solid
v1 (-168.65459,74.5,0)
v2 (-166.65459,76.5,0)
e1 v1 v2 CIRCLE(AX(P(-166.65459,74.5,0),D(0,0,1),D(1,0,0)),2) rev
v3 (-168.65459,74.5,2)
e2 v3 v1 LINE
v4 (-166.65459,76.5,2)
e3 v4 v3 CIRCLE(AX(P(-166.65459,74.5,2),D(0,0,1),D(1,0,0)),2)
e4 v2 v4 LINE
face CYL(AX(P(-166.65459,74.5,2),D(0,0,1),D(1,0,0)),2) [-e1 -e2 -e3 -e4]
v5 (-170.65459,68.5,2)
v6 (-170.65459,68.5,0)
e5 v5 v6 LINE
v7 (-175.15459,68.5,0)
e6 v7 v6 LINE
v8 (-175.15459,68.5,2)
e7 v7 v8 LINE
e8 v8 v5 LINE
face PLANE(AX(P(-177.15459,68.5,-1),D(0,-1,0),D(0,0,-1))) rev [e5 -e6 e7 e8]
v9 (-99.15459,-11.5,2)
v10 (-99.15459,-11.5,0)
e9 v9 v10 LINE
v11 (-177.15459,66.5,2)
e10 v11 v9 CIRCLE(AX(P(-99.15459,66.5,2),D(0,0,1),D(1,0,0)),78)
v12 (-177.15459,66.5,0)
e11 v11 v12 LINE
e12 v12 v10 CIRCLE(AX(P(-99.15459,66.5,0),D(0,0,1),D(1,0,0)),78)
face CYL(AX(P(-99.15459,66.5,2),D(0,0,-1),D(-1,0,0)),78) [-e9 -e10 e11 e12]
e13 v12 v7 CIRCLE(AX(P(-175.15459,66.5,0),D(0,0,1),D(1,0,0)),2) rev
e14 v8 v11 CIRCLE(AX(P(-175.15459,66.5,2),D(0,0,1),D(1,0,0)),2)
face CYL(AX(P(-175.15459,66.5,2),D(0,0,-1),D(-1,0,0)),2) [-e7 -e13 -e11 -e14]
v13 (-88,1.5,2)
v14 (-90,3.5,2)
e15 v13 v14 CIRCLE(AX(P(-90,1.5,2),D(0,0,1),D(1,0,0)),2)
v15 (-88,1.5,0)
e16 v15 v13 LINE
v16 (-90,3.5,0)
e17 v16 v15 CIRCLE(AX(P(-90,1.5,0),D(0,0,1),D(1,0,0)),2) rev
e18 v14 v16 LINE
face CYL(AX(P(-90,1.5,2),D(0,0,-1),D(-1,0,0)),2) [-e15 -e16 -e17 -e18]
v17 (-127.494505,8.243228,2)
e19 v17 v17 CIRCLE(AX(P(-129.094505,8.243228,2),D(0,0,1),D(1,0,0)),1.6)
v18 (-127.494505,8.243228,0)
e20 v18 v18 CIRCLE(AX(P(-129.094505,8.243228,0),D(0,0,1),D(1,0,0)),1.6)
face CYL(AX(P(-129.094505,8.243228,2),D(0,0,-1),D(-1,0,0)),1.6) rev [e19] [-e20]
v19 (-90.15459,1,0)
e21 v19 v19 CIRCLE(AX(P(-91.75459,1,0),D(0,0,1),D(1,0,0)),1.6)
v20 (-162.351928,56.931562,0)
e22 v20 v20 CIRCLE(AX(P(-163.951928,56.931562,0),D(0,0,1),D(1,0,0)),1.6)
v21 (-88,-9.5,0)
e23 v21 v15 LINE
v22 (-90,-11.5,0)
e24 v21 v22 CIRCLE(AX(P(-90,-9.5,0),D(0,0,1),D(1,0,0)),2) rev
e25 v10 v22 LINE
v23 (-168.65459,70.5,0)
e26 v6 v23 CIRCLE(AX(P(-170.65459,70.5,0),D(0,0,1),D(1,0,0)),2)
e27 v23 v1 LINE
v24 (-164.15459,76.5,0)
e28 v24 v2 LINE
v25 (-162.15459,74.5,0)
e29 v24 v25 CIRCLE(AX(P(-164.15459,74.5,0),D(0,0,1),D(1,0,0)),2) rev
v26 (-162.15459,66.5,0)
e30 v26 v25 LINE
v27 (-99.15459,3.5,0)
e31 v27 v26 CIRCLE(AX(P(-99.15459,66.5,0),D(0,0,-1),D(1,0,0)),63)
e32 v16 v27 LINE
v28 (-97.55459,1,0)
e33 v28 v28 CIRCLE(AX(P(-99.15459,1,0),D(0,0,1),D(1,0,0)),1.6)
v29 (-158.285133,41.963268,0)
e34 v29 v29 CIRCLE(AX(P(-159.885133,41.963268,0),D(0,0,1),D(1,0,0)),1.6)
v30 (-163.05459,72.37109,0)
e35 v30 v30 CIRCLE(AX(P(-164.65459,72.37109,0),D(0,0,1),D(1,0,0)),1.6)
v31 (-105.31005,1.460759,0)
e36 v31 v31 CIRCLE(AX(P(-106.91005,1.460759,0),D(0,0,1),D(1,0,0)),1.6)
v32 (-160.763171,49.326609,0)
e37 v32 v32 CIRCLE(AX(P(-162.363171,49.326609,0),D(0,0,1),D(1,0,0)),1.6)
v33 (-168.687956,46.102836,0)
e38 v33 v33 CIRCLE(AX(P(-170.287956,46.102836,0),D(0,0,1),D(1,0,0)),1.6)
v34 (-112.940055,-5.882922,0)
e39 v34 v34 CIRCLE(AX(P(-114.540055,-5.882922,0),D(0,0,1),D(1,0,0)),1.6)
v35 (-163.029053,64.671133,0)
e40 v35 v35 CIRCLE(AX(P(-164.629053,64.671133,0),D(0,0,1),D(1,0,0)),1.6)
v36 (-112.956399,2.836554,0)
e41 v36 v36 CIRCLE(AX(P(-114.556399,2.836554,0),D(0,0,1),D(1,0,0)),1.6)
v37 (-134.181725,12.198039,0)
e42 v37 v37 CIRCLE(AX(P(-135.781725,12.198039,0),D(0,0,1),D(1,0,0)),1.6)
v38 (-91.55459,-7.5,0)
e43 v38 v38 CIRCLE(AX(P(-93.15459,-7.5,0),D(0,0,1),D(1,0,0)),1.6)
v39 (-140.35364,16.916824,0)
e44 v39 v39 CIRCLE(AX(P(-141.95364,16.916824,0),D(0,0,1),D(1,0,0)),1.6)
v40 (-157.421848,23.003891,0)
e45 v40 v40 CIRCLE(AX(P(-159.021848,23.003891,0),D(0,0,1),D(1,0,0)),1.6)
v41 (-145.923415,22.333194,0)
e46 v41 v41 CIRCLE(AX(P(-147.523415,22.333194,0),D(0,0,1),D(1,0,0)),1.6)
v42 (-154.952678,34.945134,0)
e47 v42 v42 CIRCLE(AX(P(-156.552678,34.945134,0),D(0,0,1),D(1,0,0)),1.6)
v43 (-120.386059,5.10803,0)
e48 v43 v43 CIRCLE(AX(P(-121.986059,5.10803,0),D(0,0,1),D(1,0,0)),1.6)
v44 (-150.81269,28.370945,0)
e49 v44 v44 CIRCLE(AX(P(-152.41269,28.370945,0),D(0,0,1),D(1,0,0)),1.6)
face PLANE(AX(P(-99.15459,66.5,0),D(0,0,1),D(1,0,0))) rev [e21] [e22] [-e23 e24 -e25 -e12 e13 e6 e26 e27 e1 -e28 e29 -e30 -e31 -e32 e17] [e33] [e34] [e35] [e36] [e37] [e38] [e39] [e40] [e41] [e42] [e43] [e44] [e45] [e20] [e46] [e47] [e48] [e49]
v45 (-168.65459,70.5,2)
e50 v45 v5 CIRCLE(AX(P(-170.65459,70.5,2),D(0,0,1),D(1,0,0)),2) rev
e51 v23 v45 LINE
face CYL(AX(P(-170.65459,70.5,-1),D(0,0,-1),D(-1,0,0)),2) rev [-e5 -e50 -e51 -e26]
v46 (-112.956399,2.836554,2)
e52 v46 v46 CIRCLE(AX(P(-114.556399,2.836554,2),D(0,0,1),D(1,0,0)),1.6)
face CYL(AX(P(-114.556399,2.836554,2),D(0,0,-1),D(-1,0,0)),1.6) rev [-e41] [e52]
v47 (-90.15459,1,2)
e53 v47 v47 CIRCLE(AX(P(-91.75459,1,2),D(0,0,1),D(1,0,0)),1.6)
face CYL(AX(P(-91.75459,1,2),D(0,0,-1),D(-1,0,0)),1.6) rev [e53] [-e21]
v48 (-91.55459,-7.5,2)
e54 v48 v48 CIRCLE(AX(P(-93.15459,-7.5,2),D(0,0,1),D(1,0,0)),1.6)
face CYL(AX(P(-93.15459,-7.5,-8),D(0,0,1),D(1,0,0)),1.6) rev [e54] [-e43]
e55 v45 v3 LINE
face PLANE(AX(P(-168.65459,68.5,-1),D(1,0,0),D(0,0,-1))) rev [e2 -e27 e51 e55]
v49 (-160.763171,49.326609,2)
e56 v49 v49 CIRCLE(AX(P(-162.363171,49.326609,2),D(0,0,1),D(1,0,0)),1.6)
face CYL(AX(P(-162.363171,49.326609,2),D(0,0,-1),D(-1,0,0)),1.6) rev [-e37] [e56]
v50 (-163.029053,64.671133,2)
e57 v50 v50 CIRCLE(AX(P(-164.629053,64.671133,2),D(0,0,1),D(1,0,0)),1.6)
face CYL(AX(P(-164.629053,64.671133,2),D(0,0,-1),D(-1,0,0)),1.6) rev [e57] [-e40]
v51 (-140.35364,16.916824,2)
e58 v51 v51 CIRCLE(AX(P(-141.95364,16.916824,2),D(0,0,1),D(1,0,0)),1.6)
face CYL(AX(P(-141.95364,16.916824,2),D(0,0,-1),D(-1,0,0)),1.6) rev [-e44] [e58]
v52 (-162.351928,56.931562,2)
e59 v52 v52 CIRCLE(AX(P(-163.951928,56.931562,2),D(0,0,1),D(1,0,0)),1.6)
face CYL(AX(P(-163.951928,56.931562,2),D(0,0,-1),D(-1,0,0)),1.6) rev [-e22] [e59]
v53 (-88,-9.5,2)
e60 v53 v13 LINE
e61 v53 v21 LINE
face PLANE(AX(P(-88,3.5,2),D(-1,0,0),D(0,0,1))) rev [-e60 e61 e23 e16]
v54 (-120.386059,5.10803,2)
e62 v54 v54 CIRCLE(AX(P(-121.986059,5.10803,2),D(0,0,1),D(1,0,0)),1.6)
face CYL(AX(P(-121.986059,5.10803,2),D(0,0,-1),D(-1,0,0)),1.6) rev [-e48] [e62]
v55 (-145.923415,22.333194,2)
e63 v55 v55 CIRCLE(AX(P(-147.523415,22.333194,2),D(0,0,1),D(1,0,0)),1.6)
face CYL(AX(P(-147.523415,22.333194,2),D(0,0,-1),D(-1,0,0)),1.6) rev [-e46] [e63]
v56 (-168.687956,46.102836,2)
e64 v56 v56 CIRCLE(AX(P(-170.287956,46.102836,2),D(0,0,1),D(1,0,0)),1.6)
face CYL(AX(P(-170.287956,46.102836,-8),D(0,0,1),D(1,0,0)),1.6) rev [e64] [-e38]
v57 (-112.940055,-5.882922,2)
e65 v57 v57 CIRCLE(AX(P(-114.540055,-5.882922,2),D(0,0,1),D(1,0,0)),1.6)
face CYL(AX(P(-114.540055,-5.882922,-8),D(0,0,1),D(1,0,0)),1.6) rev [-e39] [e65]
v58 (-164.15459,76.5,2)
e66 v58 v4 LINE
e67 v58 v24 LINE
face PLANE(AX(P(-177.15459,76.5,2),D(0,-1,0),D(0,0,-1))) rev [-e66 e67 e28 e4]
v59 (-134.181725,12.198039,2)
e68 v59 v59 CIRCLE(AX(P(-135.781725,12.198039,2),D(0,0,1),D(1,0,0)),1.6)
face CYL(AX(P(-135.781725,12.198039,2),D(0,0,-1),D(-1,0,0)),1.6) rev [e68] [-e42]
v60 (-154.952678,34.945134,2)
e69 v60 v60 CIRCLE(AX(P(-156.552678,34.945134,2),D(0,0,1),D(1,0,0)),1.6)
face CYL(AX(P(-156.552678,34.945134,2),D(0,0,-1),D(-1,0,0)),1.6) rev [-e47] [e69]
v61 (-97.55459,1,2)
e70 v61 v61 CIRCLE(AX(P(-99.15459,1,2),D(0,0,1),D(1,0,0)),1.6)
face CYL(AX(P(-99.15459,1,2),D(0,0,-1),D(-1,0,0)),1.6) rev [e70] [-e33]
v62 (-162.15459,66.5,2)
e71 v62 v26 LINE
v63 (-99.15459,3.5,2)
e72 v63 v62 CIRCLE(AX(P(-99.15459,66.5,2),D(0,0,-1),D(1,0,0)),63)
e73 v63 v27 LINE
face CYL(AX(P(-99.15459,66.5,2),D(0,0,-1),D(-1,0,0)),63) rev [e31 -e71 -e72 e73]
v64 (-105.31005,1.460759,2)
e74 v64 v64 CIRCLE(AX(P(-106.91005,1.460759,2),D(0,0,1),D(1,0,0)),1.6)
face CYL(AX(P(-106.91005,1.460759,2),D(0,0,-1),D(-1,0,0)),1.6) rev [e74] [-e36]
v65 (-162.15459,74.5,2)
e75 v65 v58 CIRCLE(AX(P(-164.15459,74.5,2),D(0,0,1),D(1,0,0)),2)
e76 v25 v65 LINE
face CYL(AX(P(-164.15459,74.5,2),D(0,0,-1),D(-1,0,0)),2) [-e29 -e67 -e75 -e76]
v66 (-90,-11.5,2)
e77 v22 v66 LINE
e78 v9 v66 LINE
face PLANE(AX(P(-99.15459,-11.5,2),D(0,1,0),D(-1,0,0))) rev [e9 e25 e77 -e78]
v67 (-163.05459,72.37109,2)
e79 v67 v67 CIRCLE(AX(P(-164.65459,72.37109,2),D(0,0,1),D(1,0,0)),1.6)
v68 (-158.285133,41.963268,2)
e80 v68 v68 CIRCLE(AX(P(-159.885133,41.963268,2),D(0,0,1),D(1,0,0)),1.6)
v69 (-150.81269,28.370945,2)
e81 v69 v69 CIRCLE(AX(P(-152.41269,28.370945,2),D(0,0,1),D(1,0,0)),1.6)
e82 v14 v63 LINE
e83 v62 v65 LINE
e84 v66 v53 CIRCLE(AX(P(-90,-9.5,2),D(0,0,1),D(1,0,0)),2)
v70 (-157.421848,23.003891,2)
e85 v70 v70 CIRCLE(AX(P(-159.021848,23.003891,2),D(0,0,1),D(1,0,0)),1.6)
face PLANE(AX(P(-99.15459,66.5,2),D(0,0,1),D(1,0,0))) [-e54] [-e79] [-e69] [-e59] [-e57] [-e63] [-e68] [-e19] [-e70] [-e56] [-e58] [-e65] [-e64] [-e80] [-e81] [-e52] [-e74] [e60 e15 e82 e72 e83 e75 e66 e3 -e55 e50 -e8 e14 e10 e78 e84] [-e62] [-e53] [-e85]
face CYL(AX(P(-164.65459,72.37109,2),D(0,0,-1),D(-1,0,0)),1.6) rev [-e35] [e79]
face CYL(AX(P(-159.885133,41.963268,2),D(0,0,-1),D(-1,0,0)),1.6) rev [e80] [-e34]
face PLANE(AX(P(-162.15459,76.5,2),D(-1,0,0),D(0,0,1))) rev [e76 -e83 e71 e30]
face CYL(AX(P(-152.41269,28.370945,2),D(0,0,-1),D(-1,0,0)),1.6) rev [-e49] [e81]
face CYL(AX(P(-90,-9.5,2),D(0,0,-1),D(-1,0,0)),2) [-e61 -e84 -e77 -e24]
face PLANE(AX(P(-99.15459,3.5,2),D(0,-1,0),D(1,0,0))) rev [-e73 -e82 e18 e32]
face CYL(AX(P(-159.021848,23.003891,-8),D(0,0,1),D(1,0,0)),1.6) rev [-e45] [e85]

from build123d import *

# Parameters (mm, degrees)
SKETCH_2_R          = 1.6
EXTRUDE_1_DEPTH     = 2
SKETCH_4_W          = 8.5
SKETCH_4_H          = 8
CUT_EXTRUDE_1_DEPTH = 3
SKETCH_6_R          = 1.6
CUT_EXTRUDE_2_DEPTH = 10
FILLET_1_R          = 2
FILLET_2_R          = 2


with BuildPart() as part:
    # 草图2 → 凸台-拉伸1 (new body)
    with BuildSketch(Plane.XY):
        with BuildLine():
            Line((-162.154590294, 76.5), (-162.154590294, 66.5))
            ThreePointArc((-162.154590294, 66.5), (-143.702317509, 21.952272785), (-99.154590294, 3.5))
            Line((-99.154590294, 3.5), (-88, 3.5))
            Line((-88, 3.5), (-88, -11.5))
            Line((-88, -11.5), (-99.154590294, -11.5))
            ThreePointArc((-99.154590294, -11.5), (-154.308919227, 11.345671067), (-177.154590294, 66.5))
            Line((-177.154590294, 66.5), (-177.154590294, 76.5))
            Line((-177.154590294, 76.5), (-162.154590294, 76.5))
        make_face()
        with Locations((-91.754590294, 1)):
            Circle(SKETCH_2_R, mode=Mode.SUBTRACT)
        with Locations((-99.154590294, 1)):
            Circle(SKETCH_2_R, mode=Mode.SUBTRACT)
        with Locations((-106.910050218, 1.460759219)):
            Circle(SKETCH_2_R, mode=Mode.SUBTRACT)
        with Locations((-114.556398703, 2.836554462)):
            Circle(SKETCH_2_R, mode=Mode.SUBTRACT)
        with Locations((-121.986059394, 5.108029688)):
            Circle(SKETCH_2_R, mode=Mode.SUBTRACT)
        with Locations((-129.094504517, 8.243227549)):
            Circle(SKETCH_2_R, mode=Mode.SUBTRACT)
        with Locations((-135.781725472, 12.198038998)):
            Circle(SKETCH_2_R, mode=Mode.SUBTRACT)
        with Locations((-141.953639856, 16.916823855)):
            Circle(SKETCH_2_R, mode=Mode.SUBTRACT)
        with Locations((-147.523415105, 22.333193613)):
            Circle(SKETCH_2_R, mode=Mode.SUBTRACT)
        with Locations((-152.412690143, 28.370945455)):
            Circle(SKETCH_2_R, mode=Mode.SUBTRACT)
        with Locations((-156.552677837, 34.945134346)):
            Circle(SKETCH_2_R, mode=Mode.SUBTRACT)
        with Locations((-159.885132769, 41.963268131)):
            Circle(SKETCH_2_R, mode=Mode.SUBTRACT)
        with Locations((-162.363170682, 49.326608799)):
            Circle(SKETCH_2_R, mode=Mode.SUBTRACT)
        with Locations((-163.951928103, 56.931561629)):
            Circle(SKETCH_2_R, mode=Mode.SUBTRACT)
        with Locations((-164.62905283, 64.671132664)):
            Circle(SKETCH_2_R, mode=Mode.SUBTRACT)
        with Locations((-164.654590294, 72.371090315)):
            Circle(SKETCH_2_R, mode=Mode.SUBTRACT)
    extrude(amount=EXTRUDE_1_DEPTH)

    # 草图4 → 切除-拉伸1 (cut)
    with BuildSketch(Plane.XY.offset(2)):
        with Locations((-172.904590294, 72.5)):
            Rectangle(SKETCH_4_W, SKETCH_4_H)
    extrude(amount=-CUT_EXTRUDE_1_DEPTH, mode=Mode.SUBTRACT)

    # 草图6 → 切除-拉伸2 (cut)
    with BuildSketch(Plane.XY.offset(2)):
        with Locations((-170.287955794, 46.10283567)):
            Circle(SKETCH_6_R)
        with Locations((-159.021847878, 23.00389133)):
            Circle(SKETCH_6_R)
        with Locations((-114.540055415, -5.882922454)):
            Circle(SKETCH_6_R)
        with Locations((-93.154590294, -7.5)):
            Circle(SKETCH_6_R)
    extrude(amount=-CUT_EXTRUDE_2_DEPTH, mode=Mode.SUBTRACT)

    # 圆角1
    fillet_1_edges = [part.edges().sort_by_distance(p)[0] for p in [
        (-168.654590294, 68.5, 1),
    ]]
    fillet(fillet_1_edges, radius=FILLET_1_R)

    # 圆角2
    fillet_2_edges = [part.edges().sort_by_distance(p)[0] for p in [
        (-168.654590294, 76.5, 1),
        (-162.154590294, 76.5, 1),
        (-88, 3.5, 1),
        (-88, -11.5, 1),
        (-177.154590294, 68.5, 1),
    ]]
    fillet(fillet_2_edges, radius=FILLET_2_R - 0.0001)  # a hair under: the kernel refuses the full size


solid = part.part
